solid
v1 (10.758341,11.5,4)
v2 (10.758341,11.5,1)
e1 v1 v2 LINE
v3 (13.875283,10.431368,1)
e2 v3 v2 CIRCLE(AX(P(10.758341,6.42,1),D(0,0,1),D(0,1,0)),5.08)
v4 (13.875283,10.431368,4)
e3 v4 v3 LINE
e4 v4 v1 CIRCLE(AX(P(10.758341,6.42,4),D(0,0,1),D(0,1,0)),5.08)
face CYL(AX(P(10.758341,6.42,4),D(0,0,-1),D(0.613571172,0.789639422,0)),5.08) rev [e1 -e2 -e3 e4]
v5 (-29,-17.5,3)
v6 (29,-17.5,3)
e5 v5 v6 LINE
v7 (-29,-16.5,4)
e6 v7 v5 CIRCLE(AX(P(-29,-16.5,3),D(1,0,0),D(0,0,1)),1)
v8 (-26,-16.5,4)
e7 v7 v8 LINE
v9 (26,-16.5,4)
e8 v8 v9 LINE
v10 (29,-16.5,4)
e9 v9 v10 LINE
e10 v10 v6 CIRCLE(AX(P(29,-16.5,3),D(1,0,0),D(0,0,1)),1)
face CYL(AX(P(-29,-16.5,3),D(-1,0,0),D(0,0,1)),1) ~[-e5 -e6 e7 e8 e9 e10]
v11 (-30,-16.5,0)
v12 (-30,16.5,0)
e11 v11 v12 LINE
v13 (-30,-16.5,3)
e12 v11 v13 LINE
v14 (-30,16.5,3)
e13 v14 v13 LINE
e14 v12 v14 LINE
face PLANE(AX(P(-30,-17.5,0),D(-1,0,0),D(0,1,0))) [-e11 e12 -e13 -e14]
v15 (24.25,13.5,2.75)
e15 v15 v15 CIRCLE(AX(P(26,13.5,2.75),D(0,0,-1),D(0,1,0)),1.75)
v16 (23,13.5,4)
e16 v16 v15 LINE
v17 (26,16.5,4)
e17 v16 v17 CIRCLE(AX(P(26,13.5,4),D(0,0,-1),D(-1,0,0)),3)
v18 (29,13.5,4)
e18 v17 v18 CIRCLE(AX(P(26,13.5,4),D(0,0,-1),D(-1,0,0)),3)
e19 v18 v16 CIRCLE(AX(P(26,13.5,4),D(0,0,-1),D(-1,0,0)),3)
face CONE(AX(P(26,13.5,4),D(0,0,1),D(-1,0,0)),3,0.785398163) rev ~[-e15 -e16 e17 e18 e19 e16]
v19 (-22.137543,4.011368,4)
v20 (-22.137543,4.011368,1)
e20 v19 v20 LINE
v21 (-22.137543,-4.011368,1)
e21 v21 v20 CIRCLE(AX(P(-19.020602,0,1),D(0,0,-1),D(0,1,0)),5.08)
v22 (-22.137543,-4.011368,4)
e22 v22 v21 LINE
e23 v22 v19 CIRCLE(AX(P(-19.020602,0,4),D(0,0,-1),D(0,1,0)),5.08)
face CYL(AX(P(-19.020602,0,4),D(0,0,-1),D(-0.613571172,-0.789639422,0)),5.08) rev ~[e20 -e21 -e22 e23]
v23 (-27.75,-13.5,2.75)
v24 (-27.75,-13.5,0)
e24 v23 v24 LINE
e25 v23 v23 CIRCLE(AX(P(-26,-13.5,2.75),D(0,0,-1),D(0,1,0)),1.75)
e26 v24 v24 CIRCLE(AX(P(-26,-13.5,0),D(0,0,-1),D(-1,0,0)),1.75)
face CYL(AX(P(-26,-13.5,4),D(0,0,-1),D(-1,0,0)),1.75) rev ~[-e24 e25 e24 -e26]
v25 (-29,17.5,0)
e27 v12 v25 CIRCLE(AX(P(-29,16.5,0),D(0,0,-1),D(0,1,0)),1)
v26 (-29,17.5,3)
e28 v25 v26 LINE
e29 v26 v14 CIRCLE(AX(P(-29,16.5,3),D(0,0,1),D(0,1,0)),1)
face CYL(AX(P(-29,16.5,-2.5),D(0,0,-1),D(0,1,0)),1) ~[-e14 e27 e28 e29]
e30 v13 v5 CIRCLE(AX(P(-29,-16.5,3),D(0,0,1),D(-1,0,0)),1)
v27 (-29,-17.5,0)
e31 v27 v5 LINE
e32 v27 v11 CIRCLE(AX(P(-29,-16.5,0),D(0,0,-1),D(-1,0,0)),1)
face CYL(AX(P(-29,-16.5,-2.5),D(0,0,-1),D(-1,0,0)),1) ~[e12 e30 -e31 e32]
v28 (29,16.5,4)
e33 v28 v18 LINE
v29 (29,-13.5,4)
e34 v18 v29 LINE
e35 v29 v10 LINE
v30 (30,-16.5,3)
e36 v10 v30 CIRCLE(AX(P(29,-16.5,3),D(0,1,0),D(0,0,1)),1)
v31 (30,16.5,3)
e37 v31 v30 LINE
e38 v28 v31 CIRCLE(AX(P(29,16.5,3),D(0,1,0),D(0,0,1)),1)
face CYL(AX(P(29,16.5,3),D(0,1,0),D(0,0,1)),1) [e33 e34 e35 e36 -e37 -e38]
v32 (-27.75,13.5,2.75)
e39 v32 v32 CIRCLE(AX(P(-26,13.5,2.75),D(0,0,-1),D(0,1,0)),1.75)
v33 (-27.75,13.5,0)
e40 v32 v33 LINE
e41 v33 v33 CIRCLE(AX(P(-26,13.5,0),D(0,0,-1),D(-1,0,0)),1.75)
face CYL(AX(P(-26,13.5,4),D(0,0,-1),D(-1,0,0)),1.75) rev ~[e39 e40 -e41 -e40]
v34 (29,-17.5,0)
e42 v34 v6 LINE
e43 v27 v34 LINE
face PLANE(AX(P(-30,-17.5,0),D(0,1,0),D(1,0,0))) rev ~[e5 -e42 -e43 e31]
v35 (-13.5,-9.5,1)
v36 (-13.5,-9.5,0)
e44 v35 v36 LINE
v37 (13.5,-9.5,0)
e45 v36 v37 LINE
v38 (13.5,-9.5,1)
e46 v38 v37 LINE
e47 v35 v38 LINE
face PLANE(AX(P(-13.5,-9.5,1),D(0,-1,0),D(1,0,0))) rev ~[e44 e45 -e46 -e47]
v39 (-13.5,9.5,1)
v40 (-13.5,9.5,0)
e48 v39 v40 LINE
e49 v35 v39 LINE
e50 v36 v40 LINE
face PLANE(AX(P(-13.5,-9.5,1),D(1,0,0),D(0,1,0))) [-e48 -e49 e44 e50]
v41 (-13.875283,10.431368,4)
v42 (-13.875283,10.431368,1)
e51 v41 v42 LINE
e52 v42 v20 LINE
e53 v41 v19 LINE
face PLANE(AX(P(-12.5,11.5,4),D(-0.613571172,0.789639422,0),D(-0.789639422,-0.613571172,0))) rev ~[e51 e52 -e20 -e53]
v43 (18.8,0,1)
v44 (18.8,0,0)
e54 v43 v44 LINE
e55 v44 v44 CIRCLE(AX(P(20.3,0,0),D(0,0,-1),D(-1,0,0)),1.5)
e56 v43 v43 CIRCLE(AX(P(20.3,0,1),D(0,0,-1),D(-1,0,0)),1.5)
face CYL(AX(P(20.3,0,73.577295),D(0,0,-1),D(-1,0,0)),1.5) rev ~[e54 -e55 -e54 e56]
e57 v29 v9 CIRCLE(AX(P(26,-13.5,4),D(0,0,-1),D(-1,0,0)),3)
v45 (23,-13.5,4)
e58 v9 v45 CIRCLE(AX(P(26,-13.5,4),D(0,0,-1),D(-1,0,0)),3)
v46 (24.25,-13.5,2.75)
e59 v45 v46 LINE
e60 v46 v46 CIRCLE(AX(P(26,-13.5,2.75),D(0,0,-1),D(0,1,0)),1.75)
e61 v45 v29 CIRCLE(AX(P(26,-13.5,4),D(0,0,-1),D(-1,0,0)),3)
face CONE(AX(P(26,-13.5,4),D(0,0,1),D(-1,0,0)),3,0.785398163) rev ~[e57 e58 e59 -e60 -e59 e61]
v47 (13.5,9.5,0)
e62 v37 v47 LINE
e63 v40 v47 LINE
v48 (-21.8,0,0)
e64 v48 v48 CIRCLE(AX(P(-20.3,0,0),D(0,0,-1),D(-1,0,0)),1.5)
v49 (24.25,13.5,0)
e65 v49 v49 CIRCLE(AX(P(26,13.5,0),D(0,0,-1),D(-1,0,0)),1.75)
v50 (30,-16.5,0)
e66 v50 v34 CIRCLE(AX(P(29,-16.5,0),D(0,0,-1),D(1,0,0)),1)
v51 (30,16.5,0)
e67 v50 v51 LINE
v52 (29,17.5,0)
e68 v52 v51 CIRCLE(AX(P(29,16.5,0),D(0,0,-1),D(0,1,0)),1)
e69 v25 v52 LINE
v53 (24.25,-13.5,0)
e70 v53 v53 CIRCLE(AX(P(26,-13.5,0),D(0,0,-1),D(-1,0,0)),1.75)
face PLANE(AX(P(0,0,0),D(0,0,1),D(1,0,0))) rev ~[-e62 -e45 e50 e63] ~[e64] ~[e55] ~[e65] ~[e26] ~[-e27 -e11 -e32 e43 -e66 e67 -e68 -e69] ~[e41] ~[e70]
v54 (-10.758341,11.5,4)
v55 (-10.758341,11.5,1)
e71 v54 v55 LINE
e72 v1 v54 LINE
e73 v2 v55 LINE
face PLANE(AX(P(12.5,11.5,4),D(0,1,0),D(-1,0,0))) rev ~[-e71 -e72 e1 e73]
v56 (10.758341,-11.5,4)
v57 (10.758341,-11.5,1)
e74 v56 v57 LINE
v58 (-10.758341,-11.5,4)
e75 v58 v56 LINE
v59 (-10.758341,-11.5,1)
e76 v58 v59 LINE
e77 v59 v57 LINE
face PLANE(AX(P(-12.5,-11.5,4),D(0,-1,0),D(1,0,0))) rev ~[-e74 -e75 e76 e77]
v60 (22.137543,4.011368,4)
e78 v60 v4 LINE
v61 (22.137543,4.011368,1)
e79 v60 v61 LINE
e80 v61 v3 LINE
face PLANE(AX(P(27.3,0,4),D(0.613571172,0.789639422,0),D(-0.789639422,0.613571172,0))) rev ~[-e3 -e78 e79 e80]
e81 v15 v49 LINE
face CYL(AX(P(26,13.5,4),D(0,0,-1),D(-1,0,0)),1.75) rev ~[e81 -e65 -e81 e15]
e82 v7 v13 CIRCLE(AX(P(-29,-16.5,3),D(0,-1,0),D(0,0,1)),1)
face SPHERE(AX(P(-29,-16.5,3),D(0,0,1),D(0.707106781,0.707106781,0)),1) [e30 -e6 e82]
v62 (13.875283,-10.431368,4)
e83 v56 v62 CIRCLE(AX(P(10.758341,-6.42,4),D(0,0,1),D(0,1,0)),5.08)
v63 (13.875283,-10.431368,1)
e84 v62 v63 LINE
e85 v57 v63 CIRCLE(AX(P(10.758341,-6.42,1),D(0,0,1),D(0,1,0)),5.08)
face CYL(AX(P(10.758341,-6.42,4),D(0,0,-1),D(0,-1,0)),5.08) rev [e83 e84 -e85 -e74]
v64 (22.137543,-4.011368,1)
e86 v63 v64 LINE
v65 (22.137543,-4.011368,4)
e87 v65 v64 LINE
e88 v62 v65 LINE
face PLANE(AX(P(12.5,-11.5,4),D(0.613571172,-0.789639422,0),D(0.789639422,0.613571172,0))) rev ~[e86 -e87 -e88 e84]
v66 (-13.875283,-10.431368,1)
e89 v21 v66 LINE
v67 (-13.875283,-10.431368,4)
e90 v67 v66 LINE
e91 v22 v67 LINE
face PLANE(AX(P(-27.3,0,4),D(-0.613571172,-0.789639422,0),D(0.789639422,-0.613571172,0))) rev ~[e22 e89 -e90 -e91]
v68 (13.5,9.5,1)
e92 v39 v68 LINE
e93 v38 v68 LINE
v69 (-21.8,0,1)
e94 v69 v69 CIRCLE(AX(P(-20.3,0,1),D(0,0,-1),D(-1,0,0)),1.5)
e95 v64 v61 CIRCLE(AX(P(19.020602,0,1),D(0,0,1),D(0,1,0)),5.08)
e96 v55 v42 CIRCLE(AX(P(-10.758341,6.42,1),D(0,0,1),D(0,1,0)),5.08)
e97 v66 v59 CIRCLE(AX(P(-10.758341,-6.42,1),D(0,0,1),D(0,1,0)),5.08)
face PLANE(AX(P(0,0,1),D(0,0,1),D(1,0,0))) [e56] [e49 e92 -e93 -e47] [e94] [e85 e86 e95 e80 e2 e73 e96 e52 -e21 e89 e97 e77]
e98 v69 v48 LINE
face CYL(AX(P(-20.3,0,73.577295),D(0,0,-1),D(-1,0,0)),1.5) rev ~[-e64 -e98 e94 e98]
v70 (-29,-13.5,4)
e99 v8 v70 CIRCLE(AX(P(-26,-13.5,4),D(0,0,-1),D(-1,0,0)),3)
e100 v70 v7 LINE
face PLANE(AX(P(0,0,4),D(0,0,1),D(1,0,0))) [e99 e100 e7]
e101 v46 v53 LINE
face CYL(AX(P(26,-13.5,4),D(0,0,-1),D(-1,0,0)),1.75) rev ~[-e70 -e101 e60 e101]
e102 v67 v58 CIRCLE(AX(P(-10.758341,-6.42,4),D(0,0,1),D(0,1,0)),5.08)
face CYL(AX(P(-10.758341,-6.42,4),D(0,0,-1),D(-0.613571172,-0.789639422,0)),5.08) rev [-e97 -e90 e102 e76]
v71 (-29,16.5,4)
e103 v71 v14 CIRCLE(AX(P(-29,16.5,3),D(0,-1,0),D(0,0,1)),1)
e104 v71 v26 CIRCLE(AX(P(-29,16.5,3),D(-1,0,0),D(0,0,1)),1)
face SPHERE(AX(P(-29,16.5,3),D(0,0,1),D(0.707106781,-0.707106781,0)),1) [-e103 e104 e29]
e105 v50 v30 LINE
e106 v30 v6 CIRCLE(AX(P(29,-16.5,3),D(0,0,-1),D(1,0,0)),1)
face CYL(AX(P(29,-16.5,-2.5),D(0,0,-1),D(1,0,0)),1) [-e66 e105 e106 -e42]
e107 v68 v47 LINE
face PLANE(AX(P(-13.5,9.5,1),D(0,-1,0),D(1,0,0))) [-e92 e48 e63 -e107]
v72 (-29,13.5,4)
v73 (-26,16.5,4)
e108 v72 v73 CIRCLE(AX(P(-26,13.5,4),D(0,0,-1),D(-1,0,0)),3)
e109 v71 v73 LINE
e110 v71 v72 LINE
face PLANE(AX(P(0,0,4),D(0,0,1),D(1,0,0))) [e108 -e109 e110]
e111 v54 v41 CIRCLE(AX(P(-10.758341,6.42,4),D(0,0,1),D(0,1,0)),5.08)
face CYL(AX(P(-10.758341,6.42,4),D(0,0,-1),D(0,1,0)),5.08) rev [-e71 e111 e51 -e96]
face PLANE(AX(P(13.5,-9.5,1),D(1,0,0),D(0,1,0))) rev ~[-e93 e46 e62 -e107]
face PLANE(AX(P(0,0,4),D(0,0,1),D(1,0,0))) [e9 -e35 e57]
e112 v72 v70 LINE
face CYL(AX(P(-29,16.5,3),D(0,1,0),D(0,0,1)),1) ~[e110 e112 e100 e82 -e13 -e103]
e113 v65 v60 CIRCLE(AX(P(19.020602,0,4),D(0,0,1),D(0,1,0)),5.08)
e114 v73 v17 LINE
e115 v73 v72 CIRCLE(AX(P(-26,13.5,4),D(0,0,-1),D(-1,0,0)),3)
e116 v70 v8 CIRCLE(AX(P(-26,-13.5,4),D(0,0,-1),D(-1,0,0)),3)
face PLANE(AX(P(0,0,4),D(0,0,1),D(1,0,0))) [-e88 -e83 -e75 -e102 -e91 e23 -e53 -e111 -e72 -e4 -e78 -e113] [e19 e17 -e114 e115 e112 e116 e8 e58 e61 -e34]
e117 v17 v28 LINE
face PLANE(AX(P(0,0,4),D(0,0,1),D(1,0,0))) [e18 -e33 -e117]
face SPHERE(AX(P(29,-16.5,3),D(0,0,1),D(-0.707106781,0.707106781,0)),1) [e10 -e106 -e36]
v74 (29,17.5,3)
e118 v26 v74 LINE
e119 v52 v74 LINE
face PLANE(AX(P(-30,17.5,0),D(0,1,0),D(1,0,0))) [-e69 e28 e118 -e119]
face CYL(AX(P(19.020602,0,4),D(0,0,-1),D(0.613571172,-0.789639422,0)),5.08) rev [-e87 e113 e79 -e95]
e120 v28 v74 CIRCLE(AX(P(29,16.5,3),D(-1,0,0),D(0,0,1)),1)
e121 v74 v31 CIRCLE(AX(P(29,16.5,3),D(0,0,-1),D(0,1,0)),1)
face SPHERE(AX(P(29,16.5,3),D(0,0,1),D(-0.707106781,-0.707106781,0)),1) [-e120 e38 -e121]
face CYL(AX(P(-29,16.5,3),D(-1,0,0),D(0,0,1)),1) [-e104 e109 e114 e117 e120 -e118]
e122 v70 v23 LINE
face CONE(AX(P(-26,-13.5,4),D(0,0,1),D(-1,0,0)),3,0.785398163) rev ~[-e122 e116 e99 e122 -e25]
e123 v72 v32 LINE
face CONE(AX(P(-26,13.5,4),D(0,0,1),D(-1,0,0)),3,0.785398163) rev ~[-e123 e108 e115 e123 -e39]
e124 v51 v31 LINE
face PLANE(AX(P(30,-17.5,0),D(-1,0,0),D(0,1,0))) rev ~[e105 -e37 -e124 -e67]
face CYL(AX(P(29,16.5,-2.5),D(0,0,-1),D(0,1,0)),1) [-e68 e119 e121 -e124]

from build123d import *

# Parameters (mm, degrees)
F0_W           = 60
F0_H           = 35
F1_DEPTH       = 4
F3_DEPTH       = 3
F4_R           = 5.08
F5_W           = 27
F5_H           = 19
F6_DEPTH       = 25.4
F8_D           = 3.5
F8_CSINK_D     = 6
F8_CSINK_ANGLE = 90
F9_D           = 3
F10_T1_DEPTH   = 58
F10_T3_DEPTH   = 33
F10_T5_DEPTH   = 5.5
F10_S9_W       = 1
F10_S9_H       = 1
F10_T10_DEPTH  = 1
F10_S15_W      = 1
F10_S15_H      = 1
F10_T16_DEPTH  = 1
F10_S21_W      = 1
F10_S21_H      = 1
F10_T22_DEPTH  = 1
F10_S27_W      = 1
F10_S27_H      = 1
F10_T28_DEPTH  = 1


# Not quite as in the source:
# - a fillet or chamfer that OpenCascade refuses, or shapes differently, is made with other operations: its cross-section is extruded or revolved along the edge and cut away or added


with BuildPart() as f1:
    # F0 (on Top) → F1 (new body)
    with BuildSketch(Plane.XY):
        Rectangle(F0_W, F0_H)
    extrude(amount=F1_DEPTH)

    # F2 (on face) → F3 (cut)
    with BuildSketch(Plane.XY.offset(4)):
        Polygon((-27.3, 0), (-12.5, -11.5), (12.5, -11.5), (27.3, 0), (12.5, 11.5), (-12.5, 11.5), align=None)
    extrude(amount=-F3_DEPTH, mode=Mode.SUBTRACT)

    # F4
    f4_edges = [f1.edges().sort_by_distance(p)[0] for p in [
        (12.5, 11.5, 2.5),
        (12.5, -11.5, 2.5),
        (-12.5, -11.5, 2.5),
        (-12.5, 11.5, 2.5),
        (27.3, 0, 2.5),
        (-27.3, 0, 2.5),
    ]]
    fillet(f4_edges, radius=F4_R)

    # F5 (on face) → F6 (cut)
    with BuildSketch(Plane.XY.offset(1)):
        Rectangle(F5_W, F5_H)
    extrude(amount=-F6_DEPTH, mode=Mode.SUBTRACT)

    # F8 (through all)
    with Locations(Plane.XY.offset(4)):
        with Locations((-26, 13.5), (26, 13.5), (26, -13.5), (-26, -13.5)):
            CounterSinkHole(F8_D / 2, F8_CSINK_D / 2, counter_sink_angle=F8_CSINK_ANGLE)

    # F9 (through all)
    with Locations(Plane.XY.offset(4)):
        with Locations((-20.3, 0), (20.3, 0)):
            Hole(F9_D / 2)

    # F10: fillet of radius 1 on 8 edges, made by hand

    # F10_s2 → F10_t1 (cut)
    with BuildSketch(Plane.YZ.offset(-29)):
        with BuildLine():
            ThreePointArc((16.5, 4), (17.2071067812, 3.7071067812), (17.5, 3))
            Line((17.5, 3), (17.5, 4))
            Line((17.5, 4), (16.5, 4))
        make_face()
        with BuildLine():
            ThreePointArc((-16.5, 4), (-17.2071067812, 3.7071067812), (-17.5, 3))
            Line((-17.5, 3), (-17.5, 4))
            Line((-17.5, 4), (-16.5, 4))
        make_face()
    extrude(amount=F10_T1_DEPTH, mode=Mode.SUBTRACT)

    # F10_s4 → F10_t3 (cut)
    with BuildSketch(Plane.XZ.offset(-16.5)):
        with BuildLine():
            ThreePointArc((-29, 4), (-29.7071067812, 3.7071067812), (-30, 3))
            Line((-30, 3), (-30, 4))
            Line((-30, 4), (-29, 4))
        make_face()
        with BuildLine():
            ThreePointArc((29, 4), (29.7071067812, 3.7071067812), (30, 3))
            Line((30, 3), (30, 4))
            Line((30, 4), (29, 4))
        make_face()
    extrude(amount=F10_T3_DEPTH, mode=Mode.SUBTRACT)

    # F10_s6 → F10_t5 (cut)
    with BuildSketch(Plane.XY.offset(-2.5)):
        with BuildLine():
            ThreePointArc((30, -16.5), (29.7071067812, -17.2071067812), (29, -17.5))
            Line((29, -17.5), (30, -17.5))
            Line((30, -17.5), (30, -16.5))
        make_face()
        with BuildLine():
            ThreePointArc((29, 17.5), (29.7071067812, 17.2071067812), (30, 16.5))
            Line((30, 16.5), (30, 17.5))
            Line((30, 17.5), (29, 17.5))
        make_face()
        with BuildLine():
            ThreePointArc((-30, -16.5), (-29.7071067812, -17.2071067812), (-29, -17.5))
            Line((-29, -17.5), (-30, -17.5))
            Line((-30, -17.5), (-30, -16.5))
        make_face()
        with BuildLine():
            ThreePointArc((-29, 17.5), (-29.7071067812, 17.2071067812), (-30, 16.5))
            Line((-30, 16.5), (-30, 17.5))
            Line((-30, 17.5), (-29, 17.5))
        make_face()
    extrude(amount=F10_T5_DEPTH, mode=Mode.SUBTRACT)


with BuildPart() as f10_tool8:
    # F10_s9 → F10_t10 (new body)
    with BuildSketch(Plane.XY.offset(3)):
        with Locations((29.5, 17)):
            Rectangle(F10_S9_W, F10_S9_H)
    extrude(amount=F10_T10_DEPTH)

    # F10_s11 → F10_t12 (revolve, cut)
    with BuildSketch(Plane(origin=(29, 16.5, 3), x_dir=(-0.7071067812, -0.7071067812, 0), z_dir=(-0.7071067812, 0.7071067812, 0))):
        with BuildLine():
            ThreePointArc((0, -1), (1, 0), (0, 1))
            Line((0, 1), (0, -1))
        make_face()
    revolve(axis=Axis((29, 16.5, 3), (0, 0, 1)), mode=Mode.SUBTRACT)


with BuildPart() as f1_1:
    add(f1.part)

    # F10_t7: cut F10_tool8
    add(f10_tool8.part, mode=Mode.SUBTRACT)


with BuildPart() as f10_tool14:
    # F10_s15 → F10_t16 (new body)
    with BuildSketch(Plane.XY.offset(3)):
        with Locations((-29.5, 17)):
            Rectangle(F10_S15_W, F10_S15_H)
    extrude(amount=F10_T16_DEPTH)

    # F10_s17 → F10_t18 (revolve, cut)
    with BuildSketch(Plane(origin=(-29, 16.5, 3), x_dir=(0.7071067812, -0.7071067812, 0), z_dir=(-0.7071067812, -0.7071067812, 0))):
        with BuildLine():
            ThreePointArc((0, -1), (1, 0), (0, 1))
            Line((0, 1), (0, -1))
        make_face()
    revolve(axis=Axis((-29, 16.5, 3), (0, 0, 1)), mode=Mode.SUBTRACT)


with BuildPart() as f1_2:
    add(f1_1.part)

    # F10_t13: cut F10_tool14
    add(f10_tool14.part, mode=Mode.SUBTRACT)


with BuildPart() as f10_tool20:
    # F10_s21 → F10_t22 (new body)
    with BuildSketch(Plane.XY.offset(3)):
        with Locations((-29.5, -17)):
            Rectangle(F10_S21_W, F10_S21_H)
    extrude(amount=F10_T22_DEPTH)

    # F10_s23 → F10_t24 (revolve, cut)
    with BuildSketch(Plane(origin=(-29, -16.5, 3), x_dir=(0.7071067812, 0.7071067812, 0), z_dir=(0.7071067812, -0.7071067812, 0))):
        with BuildLine():
            ThreePointArc((0, -1), (1, 0), (0, 1))
            Line((0, 1), (0, -1))
        make_face()
    revolve(axis=Axis((-29, -16.5, 3), (0, 0, 1)), mode=Mode.SUBTRACT)


with BuildPart() as f1_3:
    add(f1_2.part)

    # F10_t19: cut F10_tool20
    add(f10_tool20.part, mode=Mode.SUBTRACT)


with BuildPart() as f10_tool26:
    # F10_s27 → F10_t28 (new body)
    with BuildSketch(Plane.XY.offset(3)):
        with Locations((29.5, -17)):
            Rectangle(F10_S27_W, F10_S27_H)
    extrude(amount=F10_T28_DEPTH)

    # F10_s29 → F10_t30 (revolve, cut)
    with BuildSketch(Plane(origin=(29, -16.5, 3), x_dir=(-0.7071067812, 0.7071067812, 0), z_dir=(0.7071067812, 0.7071067812, 0))):
        with BuildLine():
            ThreePointArc((0, -1), (1, 0), (0, 1))
            Line((0, 1), (0, -1))
        make_face()
    revolve(axis=Axis((29, -16.5, 3), (0, 0, 1)), mode=Mode.SUBTRACT)


with BuildPart() as f1_4:
    add(f1_3.part)

    # F10_t25: cut F10_tool26
    add(f10_tool26.part, mode=Mode.SUBTRACT)


solid = f1_4.part
